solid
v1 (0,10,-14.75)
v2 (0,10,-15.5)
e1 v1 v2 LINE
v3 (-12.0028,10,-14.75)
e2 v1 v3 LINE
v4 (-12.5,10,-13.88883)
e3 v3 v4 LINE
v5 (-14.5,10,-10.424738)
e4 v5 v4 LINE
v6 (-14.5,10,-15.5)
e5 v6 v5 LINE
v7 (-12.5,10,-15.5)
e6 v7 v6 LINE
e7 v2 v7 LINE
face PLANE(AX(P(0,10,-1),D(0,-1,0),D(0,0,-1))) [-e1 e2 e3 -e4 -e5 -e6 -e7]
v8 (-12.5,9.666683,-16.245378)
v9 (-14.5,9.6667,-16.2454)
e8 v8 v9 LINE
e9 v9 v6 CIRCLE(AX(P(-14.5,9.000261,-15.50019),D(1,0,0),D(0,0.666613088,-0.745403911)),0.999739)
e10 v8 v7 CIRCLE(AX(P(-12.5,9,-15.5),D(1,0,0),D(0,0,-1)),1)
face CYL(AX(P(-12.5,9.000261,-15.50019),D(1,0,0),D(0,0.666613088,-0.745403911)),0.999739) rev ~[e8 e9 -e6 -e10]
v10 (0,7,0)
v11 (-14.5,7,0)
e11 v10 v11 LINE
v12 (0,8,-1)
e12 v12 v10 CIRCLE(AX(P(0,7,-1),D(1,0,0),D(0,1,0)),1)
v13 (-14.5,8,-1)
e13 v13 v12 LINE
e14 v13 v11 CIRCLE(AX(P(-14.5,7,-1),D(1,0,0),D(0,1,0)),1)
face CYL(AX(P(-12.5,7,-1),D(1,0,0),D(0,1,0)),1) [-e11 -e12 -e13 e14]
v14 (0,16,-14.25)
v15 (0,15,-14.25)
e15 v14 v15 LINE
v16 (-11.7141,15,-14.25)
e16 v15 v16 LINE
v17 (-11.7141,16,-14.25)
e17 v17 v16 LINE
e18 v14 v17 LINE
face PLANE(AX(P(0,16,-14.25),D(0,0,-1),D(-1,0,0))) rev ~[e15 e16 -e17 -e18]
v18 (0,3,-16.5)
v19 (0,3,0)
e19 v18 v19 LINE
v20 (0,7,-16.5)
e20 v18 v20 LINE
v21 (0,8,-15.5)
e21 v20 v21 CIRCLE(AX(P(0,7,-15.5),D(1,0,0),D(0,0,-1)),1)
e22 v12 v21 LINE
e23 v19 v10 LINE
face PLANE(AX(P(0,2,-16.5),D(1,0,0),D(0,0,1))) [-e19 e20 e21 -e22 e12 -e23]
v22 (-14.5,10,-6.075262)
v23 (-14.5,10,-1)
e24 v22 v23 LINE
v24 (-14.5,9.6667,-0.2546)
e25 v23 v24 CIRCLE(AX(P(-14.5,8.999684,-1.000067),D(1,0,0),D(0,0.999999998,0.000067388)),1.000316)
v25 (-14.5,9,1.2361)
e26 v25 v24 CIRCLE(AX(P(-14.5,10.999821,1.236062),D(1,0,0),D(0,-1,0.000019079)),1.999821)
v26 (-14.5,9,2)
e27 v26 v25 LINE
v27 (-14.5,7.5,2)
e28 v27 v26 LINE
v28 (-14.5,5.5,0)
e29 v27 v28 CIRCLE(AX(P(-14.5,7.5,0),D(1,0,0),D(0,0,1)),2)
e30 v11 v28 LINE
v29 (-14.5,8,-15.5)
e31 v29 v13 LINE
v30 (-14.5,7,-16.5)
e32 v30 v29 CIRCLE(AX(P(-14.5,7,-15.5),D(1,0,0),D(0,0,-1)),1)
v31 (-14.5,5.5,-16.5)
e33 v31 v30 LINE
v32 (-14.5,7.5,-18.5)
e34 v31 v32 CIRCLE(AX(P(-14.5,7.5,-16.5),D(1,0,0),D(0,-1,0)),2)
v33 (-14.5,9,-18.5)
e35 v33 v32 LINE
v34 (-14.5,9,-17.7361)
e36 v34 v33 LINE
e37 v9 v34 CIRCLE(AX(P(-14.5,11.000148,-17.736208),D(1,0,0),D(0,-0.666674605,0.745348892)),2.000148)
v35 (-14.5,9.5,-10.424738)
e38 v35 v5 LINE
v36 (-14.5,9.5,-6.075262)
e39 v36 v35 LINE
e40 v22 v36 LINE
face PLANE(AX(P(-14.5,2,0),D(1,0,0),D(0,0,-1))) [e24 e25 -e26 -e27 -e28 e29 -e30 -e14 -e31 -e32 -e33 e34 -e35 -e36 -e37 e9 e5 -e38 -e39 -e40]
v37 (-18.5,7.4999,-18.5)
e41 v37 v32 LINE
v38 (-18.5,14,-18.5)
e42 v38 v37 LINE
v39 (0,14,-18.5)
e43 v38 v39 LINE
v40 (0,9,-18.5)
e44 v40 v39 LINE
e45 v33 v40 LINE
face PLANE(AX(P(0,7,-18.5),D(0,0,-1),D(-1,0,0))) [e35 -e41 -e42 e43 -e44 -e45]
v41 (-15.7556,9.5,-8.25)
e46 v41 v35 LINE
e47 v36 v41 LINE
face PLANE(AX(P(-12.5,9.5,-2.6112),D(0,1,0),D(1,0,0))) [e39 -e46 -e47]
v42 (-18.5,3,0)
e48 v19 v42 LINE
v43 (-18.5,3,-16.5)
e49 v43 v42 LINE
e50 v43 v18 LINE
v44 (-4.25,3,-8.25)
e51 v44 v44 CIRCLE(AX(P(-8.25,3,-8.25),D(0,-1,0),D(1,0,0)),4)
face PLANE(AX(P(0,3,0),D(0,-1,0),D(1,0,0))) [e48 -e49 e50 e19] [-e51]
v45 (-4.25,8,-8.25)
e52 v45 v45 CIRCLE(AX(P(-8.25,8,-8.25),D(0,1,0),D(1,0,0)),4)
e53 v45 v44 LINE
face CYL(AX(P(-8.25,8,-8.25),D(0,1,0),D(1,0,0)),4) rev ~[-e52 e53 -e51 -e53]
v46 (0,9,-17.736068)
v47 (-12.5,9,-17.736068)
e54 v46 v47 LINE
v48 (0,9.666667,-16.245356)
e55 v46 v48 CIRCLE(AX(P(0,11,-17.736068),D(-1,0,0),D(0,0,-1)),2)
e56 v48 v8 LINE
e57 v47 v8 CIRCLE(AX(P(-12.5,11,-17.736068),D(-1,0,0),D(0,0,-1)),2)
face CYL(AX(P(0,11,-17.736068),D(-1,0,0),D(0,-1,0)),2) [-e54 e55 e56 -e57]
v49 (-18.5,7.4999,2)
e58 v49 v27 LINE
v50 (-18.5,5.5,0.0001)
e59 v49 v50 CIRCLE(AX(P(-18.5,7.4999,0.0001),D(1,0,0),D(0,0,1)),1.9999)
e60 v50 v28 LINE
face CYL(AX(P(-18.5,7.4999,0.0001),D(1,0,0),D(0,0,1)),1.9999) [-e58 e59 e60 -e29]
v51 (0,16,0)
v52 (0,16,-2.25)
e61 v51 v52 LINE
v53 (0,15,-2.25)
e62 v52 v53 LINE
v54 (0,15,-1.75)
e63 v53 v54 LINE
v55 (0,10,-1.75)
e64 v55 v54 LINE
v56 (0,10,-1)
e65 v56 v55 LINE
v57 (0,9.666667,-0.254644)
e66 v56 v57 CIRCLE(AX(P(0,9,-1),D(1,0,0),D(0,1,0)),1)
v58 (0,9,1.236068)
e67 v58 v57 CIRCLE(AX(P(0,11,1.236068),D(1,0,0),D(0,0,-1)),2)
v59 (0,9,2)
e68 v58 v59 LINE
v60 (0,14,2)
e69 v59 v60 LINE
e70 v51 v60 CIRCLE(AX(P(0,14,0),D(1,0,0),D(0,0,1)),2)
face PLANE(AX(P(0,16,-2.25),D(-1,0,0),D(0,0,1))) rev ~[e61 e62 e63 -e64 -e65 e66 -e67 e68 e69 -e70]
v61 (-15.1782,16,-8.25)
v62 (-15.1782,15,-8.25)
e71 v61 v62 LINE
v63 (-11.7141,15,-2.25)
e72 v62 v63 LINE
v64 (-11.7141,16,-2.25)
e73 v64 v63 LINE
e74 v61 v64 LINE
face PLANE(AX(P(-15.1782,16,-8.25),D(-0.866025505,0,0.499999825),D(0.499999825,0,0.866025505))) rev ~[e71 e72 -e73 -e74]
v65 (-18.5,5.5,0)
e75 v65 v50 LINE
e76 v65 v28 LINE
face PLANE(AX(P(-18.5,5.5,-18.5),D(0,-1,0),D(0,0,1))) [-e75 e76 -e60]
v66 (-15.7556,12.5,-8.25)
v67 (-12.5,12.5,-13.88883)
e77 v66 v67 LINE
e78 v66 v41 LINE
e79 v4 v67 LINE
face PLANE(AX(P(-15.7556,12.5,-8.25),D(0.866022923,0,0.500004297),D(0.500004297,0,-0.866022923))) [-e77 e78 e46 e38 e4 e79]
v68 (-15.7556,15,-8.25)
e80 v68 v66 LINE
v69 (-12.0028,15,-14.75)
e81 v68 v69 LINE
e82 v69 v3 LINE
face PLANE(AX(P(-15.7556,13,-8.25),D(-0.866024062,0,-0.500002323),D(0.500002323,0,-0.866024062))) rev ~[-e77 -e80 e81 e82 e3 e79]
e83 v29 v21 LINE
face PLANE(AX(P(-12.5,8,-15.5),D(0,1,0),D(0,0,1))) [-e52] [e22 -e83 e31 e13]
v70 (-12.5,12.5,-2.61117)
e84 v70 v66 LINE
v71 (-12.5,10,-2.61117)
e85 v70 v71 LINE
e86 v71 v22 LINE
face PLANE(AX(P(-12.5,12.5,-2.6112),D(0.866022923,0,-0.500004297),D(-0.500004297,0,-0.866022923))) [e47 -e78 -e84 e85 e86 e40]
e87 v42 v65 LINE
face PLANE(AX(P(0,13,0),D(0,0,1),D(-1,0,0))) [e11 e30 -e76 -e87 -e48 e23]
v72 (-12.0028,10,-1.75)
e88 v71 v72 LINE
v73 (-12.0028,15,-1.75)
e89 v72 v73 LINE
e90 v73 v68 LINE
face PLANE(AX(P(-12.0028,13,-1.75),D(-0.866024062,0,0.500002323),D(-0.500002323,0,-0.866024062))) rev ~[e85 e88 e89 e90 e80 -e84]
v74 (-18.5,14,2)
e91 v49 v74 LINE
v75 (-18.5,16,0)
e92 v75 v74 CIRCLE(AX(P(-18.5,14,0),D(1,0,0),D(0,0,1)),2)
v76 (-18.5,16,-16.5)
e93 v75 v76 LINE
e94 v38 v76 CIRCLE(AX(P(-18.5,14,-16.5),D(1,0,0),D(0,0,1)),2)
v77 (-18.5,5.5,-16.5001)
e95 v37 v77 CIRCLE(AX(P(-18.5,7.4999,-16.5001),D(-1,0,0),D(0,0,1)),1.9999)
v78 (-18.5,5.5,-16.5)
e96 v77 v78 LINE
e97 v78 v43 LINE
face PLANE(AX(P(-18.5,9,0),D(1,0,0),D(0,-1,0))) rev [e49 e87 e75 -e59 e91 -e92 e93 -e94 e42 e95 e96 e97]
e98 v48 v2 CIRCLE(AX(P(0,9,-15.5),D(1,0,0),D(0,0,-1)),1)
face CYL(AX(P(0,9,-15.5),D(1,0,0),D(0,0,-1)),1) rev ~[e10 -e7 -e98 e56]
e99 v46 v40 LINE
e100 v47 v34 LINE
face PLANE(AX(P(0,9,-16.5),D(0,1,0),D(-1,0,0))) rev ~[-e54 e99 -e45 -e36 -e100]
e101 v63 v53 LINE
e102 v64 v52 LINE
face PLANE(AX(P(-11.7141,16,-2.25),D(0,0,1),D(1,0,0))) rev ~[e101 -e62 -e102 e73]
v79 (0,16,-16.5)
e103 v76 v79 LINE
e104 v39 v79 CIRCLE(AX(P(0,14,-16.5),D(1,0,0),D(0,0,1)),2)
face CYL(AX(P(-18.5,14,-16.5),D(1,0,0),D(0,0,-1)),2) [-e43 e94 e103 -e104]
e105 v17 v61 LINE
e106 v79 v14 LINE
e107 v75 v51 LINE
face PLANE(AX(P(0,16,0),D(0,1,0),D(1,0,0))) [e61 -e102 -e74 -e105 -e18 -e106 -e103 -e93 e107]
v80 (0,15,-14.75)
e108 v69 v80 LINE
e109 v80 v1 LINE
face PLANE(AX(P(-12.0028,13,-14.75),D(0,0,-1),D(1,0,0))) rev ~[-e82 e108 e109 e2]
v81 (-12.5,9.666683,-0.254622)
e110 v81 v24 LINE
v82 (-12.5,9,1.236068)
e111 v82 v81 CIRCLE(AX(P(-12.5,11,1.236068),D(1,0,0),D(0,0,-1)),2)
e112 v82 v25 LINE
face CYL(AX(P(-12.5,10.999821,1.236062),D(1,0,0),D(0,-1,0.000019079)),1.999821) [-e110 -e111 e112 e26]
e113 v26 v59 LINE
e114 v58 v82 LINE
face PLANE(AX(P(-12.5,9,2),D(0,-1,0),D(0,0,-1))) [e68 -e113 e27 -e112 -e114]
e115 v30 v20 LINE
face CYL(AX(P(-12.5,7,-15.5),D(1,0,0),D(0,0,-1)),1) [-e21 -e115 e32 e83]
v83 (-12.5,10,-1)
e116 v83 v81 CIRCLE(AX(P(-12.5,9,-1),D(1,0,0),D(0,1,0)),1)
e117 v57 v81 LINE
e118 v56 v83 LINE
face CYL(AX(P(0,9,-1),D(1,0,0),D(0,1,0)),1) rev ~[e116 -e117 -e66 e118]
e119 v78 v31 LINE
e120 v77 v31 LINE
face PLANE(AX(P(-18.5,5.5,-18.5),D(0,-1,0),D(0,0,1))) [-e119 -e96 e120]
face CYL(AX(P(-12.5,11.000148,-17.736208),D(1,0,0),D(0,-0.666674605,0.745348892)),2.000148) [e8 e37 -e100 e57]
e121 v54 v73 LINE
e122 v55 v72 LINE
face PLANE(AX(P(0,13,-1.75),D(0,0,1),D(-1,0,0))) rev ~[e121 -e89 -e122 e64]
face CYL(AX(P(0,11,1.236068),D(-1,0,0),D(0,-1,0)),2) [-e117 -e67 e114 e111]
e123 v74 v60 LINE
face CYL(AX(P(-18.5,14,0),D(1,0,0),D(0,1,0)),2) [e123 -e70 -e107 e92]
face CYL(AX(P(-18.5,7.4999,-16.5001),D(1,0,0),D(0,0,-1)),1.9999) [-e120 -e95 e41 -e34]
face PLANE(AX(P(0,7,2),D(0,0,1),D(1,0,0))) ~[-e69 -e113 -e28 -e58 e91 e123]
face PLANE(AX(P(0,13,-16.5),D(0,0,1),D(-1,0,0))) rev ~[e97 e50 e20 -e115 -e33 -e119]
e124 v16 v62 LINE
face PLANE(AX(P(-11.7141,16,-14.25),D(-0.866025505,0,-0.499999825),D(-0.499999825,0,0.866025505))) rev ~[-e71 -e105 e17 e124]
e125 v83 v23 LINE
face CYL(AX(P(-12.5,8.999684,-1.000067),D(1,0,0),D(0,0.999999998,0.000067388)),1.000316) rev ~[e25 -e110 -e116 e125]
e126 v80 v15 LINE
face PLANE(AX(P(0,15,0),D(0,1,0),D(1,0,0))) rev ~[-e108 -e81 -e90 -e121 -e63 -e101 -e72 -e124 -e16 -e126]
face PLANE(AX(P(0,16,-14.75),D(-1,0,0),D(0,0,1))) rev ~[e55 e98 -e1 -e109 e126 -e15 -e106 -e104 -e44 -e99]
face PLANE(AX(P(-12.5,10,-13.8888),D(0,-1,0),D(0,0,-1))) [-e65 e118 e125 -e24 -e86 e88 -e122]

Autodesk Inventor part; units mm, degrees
ref_plane "YZ Plane" through (0, 0, 0) normal (1, 0, 0) x (0, 1, 0)
ref_plane "XZ Plane" through (0, 0, 0) normal (0, 1, 0) x (-1, 0, 0)
ref_plane "XY Plane" through (0, 0, 0) normal (0, 0, 1) x (1, 0, 0)
sketch "Sketch1" plane through (0, 0, 0) normal (0, 1, 0) x (-1, 0, 0)
  line L0 (0, 0) -> (16.5, 0)
  line L1 (16.5, 0) -> (16.5, -16.5)
  line L2 (16.5, -16.5) -> (0, -16.5)
  line L3 (0, -16.5) -> (0, 0)
  dimension "d0" = 16.5
  dimension "d1" = 16.5
extrude "Extrusion1" add sketch "Sketch1" along normal blind 11
sketch "Sketch2" plane through (0, 0, 0) normal (1, 0, 0) x (0, 0, -1)
  line L0 (0, 0) -> (0, 5)
  line L1 (1, 6) -> (15.5, 6)
  line L2 (16.5, 0) -> (16.5, 11) projected
  line L3 (16.5, 0) -> (16.5, 5)
  arc A0 (1, 6) -> (0, 5) centre (1, 5) ccw
  arc A1 (16.5, 5) -> (15.5, 6) centre (15.5, 5) ccw
  line L4 (0, 5) -> (0, 6)
  line L5 (1, 7) -> (15.5, 7)
  line L6 (16.5, 5) -> (16.5, 6)
  arc A2 (1, 7) -> (0, 6) centre (1, 6) ccw
  arc A3 (16.5, 6) -> (15.5, 7) centre (15.5, 6) ccw
  line L7 (0, 11) -> (16.5, 11) projected
  line L8 (16.5, 11) -> (0, 11) projected
  point P0 (0, 6)
  point P1 (16.5, 6)
  point P2 (0, 7)
  point P3 (16.5, 7)
  dimension "d4" = 6
  dimension "d5" = 1
  dimension "d6" = 2
  dimension "d7" = 1
sketch "Sketch3" plane through (0, 11, 0) normal (0, 1, 0) x (1, 0, 0)
  line L0 (-15.7556, 8.25) -> (-12.0028, 14.75)
  line L1 (-12.0028, 14.75) -> (-4.4972, 14.75)
  line L2 (-4.4972, 14.75) -> (-0.7444, 8.25)
  line L3 (-0.7444, 8.25) -> (-4.4972, 1.75)
  line L4 (-4.4972, 1.75) -> (-12.0028, 1.75)
  line L5 (-12.0028, 1.75) -> (-15.7556, 8.25)
  point P0 (0, 0)
  point P1 (-8.25, 8.25)
  dimension "d8" = 13
extrude "Extrusion2" cut sketch "Sketch3" against normal blind 5
sketch "Sketch4" plane through (0, 6, 0) normal (0, 1, 0) x (1, 0, 0)
  line L0 (-4.4972, 1.75) -> (-12.0028, 1.75) projected
  line L1 (-12.0028, 14.75) -> (-4.4972, 14.75) projected
  circle A0 centre (-8.25, 8.25) radius 4
  point P0 (0, 0)
  dimension "d11" = 8
extrude "Extrusion3" cut sketch "Sketch4" against normal blind 20
extrude "Extrusion4" cut sketch "Sketch2" against normal blind 12.5
sketch "Sketch5" plane through (0, 11, 0) normal (0, 1, 0) x (1, 0, 0)
  line L0 (-4.4972, 1.75) -> (-12.0028, 1.75) projected
  line L1 (-12.0028, 1.75) -> (3.1486, 1.75)
  line L2 (3.1486, 1.75) -> (3.1486, 14.75)
  line L3 (3.1486, 14.75) -> (-12.0028, 14.75)
  line L4 (-12.0028, 14.75) -> (-12.0028, 1.75)
  point P0 (0, 0)
  dimension "d16" = 13
extrude "Extrusion5" cut sketch "Sketch5" against normal up to surface (4 mm away)
sketch "Sketch6" plane through (-16.5, 0, -16.5) normal (-1, 0, 0) x (0, 0, 1)
  line L0 (16.5, 0) -> (0, 0) projected
  line L1 (16.5, 0) -> (16.5, 11) projected
  line L2 (0, 11) -> (16.5, 11) projected
  line L3 (0, 0) -> (0, 11) projected
extrude "Extrusion6" add sketch "Sketch6" along normal blind 2
sketch "Sketch7" plane through (0, 0, 0) normal (0, -1, 0) x (1, 0, 0)
  circle A0 centre (-8.25, -8.25) radius 4 projected
  line L0 (0, 0) -> (-18.5, 0) projected
  line L1 (-18.5, -16.5) -> (-18.5, 0) projected
  line L2 (-18.5, -16.5) -> (0, -16.5) projected
  line L3 (0, -16.5) -> (0, 0) projected
extrude "Extrusion7" cut sketch "Sketch7" against normal blind 1
sketch "Sketch8" plane through (0, 11, 0) normal (0, 1, 0) x (1, 0, 0)
  line L0 (0, 1.75) -> (-12.0028, 1.75) projected
  line L1 (-12.0028, 1.75) -> (-15.7556, 8.25) projected
  line L2 (-15.7556, 8.25) -> (-12.0028, 14.75) projected
  line L3 (-12.0028, 14.75) -> (0, 14.75) projected
  line L4 (0, 14.75) -> (0, 16.5) projected
  line L5 (0, 16.5) -> (-18.5, 16.5) projected
  line L6 (-18.5, 0) -> (-18.5, 16.5) projected
  line L7 (0, 0) -> (-18.5, 0) projected
  line L8 (0, 0) -> (0, 1.75) projected
extrude "Extrusion8" add sketch "Sketch8" along normal blind 3
sketch "Sketch10" plane through (0, 7, -1) normal (1, 0, 0) x (0, 0, -1)
  line L0 (15.5, -1) -> (15.5, -2) projected
  line L1 (15.5, -1) -> (-1, -1)
  line L2 (-1, -1) -> (-1, 0)
  line L3 (0, 1) -> (14.5, 1)
  line L4 (15.5, 0) -> (15.5, -1)
  arc A0 (0, 1) -> (-1, 0) centre (0, 0) ccw
  arc A1 (15.5, 0) -> (14.5, 1) centre (14.5, 0) ccw
  point P0 (-1, -7)
  point P1 (-1, 1)
  point P2 (15.5, 1)
  dimension "d28" = 16.5
  dimension "d29" = 2
  dimension "d30" = 1
extrude "Extrusion9" cut sketch "Sketch10" against normal up to surface (12.5 mm away)
sketch "Sketch11" plane through (0, 5, -16.5) normal (0, 0, -1) x (-1, 0, 0)
  line L0 (18.5, 9) -> (0, 9) projected
  line L1 (0, 2) -> (0, 9) projected
  line L2 (18.5, 9) -> (0, 9)
  line L3 (0, 9) -> (0, 2)
  line L4 (0, 2) -> (18.5, 2)
  line L5 (18.5, 2) -> (18.5, 9)
  point P0 (0, -5)
extrude "Extrusion10" add sketch "Sketch11" along normal blind 2
ref_plane "Work Plane1" through (-15.7556, 14, -8.25) normal (0, 0, -1) x (-1, 0, 0)
mirror "Mirror1" about plane through (-15.7556, 14, -8.25) normal (0, 0, -1) of "Extrusion8", "Extrusion10", "Extrusion9", "Extrusion2"
sketch "Sketch12" plane through (-18.5, 0, -16.5) normal (-1, 0, 0) x (0, 0, 1)
  line L0 (18.5, 14) -> (18.5, 7) projected
  line L1 (18.5, 10.5) -> (-2, 10.5)
  line L2 (-2, 10.5) -> (-2, 3.5)
  line L3 (-2, 3.5) -> (18.5, 3.5)
  line L4 (18.5, 3.5) -> (18.5, 10.5)
  point P0 (16.5, 0)
  point P1 (18.5, 11)
  point P2 (18.5, 9)
extrude "Extrusion11" add sketch "Sketch12" against normal up to surface (6 mm away)
fillet "Fillet3" radius 2 2 edges at (-15.5, 3.5, -18.5) (-15.5, 3.5, 2)
fillet "Fillet4" radius 2 2 edges at (-9.25, 14, -18.5) (-9.25, 14, 2)
fillet "Fillet5" radius 2 2 edges at (-6.25, 7, -16.5) (-6.25, 7, 0)
sketch "Sketch13" plane through (-12.5, 10.5, -2.6112) normal (0, 1, 0) x (1, 0, 0)
  line L0 (-3.2556, 5.6388) -> (0, 11.2776) projected
  line L1 (0, 0) -> (-3.2556, 5.6388) projected
  line L2 (0, 0) -> (0, 11.2776) projected
  point P0 (12.5, -2.6112)
extrude "Extrusion12" cut sketch "Sketch13" against normal blind 3
sketch "Sketch14" plane through (-12.5, 0, 0) normal (1, 0, 0) x (0, 0, -1)
  line L0 (13.8888, 8) -> (13.8888, 7.5) projected
  line L1 (13.8888, 7.5) -> (2.6112, 7.5) projected
  line L2 (2.6112, 7.5) -> (2.6112, 8) projected
  line L3 (1, 8) -> (2.6112, 8) projected
  arc A0 (1, 8) -> (0.2546, 7.6667) centre (1, 7) ccw projected
  arc A1 (-1.2361, 7) -> (0.2546, 7.6667) centre (-1.2361, 9) ccw projected
  line L4 (-2, 7) -> (-1.2361, 7) projected
  line L5 (-2, 5.5) -> (-2, 7) projected
  arc A2 (-2, 5.5) -> (0, 3.5) centre (0, 5.5) ccw projected
  line L6 (0, 5) -> (0, 3.5) projected
  arc A3 (1, 6) -> (0, 5) centre (1, 5) ccw projected
  line L7 (15.5, 6) -> (1, 6) projected
  arc A4 (16.5, 5) -> (15.5, 6) centre (15.5, 5) ccw projected
  line L8 (16.5, 3.5) -> (16.5, 5) projected
  arc A5 (16.5, 3.5) -> (18.5, 5.5) centre (16.5, 5.5) ccw projected
  line L9 (18.5, 7) -> (18.5, 5.5) projected
  line L10 (17.7361, 7) -> (18.5, 7) projected
  arc A6 (16.2454, 7.6667) -> (17.7361, 7) centre (17.7361, 9) ccw projected
  arc A7 (16.2454, 7.6667) -> (15.5, 8) centre (15.5, 7) ccw projected
  line L11 (13.8888, 8) -> (15.5, 8) projected
  line L12 (13.8888, 8) -> (2.6112, 8)
  line L13 (2.6112, 8) -> (2.6112, 7.5)
  line L14 (2.6112, 7.5) -> (13.8888, 7.5)
  line L15 (13.8888, 7.5) -> (13.8888, 8)
  point P0 (0, 0)
extrude "Extrusion13" cut sketch "Sketch14" against normal blind 2
sketch "Sketch15" plane through (0, 14, 0) normal (0, 1, 0) x (1, 0, 0)
  line L0 (0, 0) -> (-18.5, 0) projected
  line L1 (0, 1.75) -> (0, 0) projected
  line L2 (0, 1.75) -> (-12.0028, 1.75) projected
  line L3 (-12.0028, 1.75) -> (-15.7556, 8.25) projected
  line L4 (-15.7556, 8.25) -> (-12.0028, 14.75) projected
  line L5 (-12.0028, 14.75) -> (0, 14.75) projected
  line L6 (0, 14.75) -> (0, 16.5) projected
  line L7 (-18.5, 16.5) -> (0, 16.5) projected
  line L8 (-18.5, 0) -> (-18.5, 16.5) projected
  line L9 (-11.7141, 14.25) -> (-15.1782, 8.25)
  line L10 (-15.1782, 8.25) -> (-11.7141, 2.25)
  line L11 (-11.7141, 2.25) -> (0, 2.25)
  line L12 (0, -0.5) -> (-19, -0.5)
  line L13 (-19, -0.5) -> (-19, 17)
  line L14 (-19, 17) -> (0, 17)
  line L15 (0, 14.25) -> (-11.7141, 14.25)
  line L16 (0, 14.75) -> (0, 14.25)
  line L17 (0, 2.25) -> (0, 1.75)
  line L18 (0.5, 2.25) -> (0.5, 1.75)
  line L19 (0.5, 14.75) -> (0.5, 14.25)
  point P0 (0, 0)
  dimension "d45" = 0.5
extrude "Extrusion14" add sketch "Sketch15" against normal blind 1 contours L2 L3 L4 L5 L16 L15 L9 L10 L11 L17
move or copy body "Move Body1" bodies to move or copy 1 copy no translate (0, 2, 0)
properties part number "nut holder"
